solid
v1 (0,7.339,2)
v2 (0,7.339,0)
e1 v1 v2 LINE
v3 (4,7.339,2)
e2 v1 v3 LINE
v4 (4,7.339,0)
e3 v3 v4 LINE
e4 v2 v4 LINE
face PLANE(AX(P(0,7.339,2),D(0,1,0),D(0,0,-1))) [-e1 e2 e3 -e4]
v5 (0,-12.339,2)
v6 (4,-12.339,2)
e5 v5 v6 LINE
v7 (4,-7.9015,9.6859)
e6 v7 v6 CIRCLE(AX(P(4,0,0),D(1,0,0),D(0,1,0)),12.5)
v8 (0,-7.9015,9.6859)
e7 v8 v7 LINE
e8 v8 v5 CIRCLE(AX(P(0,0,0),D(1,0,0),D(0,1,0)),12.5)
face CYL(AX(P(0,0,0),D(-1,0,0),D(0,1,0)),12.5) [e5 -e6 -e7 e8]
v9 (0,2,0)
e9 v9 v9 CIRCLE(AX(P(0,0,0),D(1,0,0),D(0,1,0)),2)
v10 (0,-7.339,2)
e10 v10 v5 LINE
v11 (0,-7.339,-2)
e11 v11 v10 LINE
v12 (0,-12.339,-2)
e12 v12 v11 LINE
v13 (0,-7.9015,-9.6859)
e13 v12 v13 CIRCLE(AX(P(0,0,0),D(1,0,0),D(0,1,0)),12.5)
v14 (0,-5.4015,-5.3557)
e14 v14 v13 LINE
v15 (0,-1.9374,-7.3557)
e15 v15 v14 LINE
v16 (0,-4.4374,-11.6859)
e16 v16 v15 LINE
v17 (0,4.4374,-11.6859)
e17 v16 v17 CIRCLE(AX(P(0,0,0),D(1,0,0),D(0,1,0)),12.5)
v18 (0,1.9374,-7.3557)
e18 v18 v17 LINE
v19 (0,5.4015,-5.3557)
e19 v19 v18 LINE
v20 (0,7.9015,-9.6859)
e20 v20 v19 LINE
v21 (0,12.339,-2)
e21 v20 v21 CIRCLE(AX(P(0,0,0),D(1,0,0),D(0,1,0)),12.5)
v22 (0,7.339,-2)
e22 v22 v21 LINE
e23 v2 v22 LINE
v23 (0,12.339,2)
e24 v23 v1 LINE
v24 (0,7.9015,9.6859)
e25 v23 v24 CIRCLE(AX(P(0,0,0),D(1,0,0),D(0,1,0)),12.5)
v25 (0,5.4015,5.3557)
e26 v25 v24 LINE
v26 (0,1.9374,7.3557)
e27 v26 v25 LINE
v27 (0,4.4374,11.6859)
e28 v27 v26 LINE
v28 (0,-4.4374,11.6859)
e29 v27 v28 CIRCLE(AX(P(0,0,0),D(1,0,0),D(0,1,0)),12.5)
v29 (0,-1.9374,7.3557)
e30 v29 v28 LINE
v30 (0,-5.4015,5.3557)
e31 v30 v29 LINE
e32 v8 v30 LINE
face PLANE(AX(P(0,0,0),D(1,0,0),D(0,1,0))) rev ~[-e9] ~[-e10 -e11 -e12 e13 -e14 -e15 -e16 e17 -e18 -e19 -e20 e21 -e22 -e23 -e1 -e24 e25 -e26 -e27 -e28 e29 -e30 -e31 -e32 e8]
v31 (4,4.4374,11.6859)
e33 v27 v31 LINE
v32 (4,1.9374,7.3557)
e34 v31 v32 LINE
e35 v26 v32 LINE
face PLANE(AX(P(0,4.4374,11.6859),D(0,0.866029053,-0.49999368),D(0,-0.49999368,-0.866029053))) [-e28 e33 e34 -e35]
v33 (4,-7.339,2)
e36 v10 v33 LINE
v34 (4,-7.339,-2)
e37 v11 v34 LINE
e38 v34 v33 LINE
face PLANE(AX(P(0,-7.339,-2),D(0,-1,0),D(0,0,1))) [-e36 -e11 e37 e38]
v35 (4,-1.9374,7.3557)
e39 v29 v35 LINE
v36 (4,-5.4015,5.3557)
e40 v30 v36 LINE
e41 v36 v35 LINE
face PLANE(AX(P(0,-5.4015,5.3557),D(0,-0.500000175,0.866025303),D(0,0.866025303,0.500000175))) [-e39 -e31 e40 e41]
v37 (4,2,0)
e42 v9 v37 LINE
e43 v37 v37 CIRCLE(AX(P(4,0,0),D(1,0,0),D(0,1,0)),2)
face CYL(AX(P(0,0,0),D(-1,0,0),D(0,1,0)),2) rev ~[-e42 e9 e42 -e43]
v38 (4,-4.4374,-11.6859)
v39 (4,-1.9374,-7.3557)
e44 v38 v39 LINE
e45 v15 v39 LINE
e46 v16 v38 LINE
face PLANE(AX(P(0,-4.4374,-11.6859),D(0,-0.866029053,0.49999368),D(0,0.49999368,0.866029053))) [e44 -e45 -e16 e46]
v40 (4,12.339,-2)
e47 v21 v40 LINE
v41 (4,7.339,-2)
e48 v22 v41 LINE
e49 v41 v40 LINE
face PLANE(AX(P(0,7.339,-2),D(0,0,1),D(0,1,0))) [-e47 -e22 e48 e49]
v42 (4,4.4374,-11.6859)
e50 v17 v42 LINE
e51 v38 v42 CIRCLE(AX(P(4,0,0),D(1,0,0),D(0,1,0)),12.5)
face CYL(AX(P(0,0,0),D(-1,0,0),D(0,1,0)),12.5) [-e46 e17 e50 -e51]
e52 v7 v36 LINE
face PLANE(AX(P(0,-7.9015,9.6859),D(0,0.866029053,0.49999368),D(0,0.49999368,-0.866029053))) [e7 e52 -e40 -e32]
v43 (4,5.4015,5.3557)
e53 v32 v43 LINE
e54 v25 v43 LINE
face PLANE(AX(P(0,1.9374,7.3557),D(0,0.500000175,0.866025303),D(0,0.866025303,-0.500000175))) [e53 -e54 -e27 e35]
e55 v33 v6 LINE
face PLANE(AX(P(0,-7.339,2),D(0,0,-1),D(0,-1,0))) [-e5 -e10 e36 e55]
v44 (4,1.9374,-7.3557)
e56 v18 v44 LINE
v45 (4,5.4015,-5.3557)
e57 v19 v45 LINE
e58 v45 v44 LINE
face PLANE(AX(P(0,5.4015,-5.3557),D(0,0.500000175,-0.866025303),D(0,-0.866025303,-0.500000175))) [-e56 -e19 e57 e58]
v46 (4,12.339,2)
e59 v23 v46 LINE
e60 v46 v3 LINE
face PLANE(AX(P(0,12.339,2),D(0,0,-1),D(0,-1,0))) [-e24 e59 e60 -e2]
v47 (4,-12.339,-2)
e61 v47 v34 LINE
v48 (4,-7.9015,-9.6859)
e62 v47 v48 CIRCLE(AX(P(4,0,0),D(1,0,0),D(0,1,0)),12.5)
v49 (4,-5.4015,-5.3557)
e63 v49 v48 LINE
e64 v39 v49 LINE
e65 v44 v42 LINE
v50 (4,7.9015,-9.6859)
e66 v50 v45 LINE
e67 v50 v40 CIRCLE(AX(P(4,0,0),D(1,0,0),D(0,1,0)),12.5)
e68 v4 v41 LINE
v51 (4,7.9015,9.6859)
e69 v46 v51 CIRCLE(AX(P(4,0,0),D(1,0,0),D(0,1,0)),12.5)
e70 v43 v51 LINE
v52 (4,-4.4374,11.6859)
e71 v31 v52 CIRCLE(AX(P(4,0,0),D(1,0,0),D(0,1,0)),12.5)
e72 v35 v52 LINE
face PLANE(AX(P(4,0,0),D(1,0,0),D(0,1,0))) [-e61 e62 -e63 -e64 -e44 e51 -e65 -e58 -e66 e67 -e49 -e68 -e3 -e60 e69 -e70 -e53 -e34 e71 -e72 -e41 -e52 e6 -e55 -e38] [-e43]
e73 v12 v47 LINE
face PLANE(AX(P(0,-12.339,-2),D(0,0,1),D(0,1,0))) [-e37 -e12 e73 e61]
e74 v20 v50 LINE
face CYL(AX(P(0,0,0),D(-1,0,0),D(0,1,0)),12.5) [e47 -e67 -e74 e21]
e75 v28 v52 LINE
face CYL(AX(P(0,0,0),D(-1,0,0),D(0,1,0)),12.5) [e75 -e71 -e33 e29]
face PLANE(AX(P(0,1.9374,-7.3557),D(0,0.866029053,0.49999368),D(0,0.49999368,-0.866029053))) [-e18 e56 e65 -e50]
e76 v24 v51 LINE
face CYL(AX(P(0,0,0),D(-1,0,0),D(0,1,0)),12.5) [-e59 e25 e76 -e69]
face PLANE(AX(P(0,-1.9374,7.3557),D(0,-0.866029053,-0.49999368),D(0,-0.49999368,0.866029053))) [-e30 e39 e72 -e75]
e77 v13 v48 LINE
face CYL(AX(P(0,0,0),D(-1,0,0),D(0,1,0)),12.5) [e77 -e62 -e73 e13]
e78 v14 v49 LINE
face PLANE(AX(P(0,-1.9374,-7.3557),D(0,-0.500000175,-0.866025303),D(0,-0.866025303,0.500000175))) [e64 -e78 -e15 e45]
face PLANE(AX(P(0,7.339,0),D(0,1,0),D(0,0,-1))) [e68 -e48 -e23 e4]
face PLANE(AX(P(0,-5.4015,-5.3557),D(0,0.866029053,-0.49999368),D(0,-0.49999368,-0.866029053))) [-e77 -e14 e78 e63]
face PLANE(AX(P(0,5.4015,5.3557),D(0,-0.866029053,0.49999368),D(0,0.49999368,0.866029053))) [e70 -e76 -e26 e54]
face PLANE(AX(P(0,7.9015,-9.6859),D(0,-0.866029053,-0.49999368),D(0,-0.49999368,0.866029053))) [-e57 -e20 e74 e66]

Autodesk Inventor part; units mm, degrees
ref_plane "YZ Plane" through (0, 0, 0) normal (1, 0, 0) x (0, 1, 0)
ref_plane "XZ Plane" through (0, 0, 0) normal (0, 1, 0) x (-1, 0, 0)
ref_plane "XY Plane" through (0, 0, 0) normal (0, 0, 1) x (1, 0, 0)
sketch "Эскиз1" plane through (0, 0, 0) normal (1, 0, 0) x (0, 1, 0)
  circle A0 centre (0, 0) radius 12.5
  line L0 (12.339, 2) -> (7.339, 2)
  line L1 (7.339, 2) -> (7.339, -2)
  line L2 (7.339, -2) -> (12.339, -2)
  line L3 (12.5, 0) -> (0, 0)
  line L4 (4.4374, 11.6859) -> (1.9374, 7.3557)
  line L5 (1.9374, 7.3557) -> (5.4015, 5.3557)
  line L6 (5.4015, 5.3557) -> (7.9015, 9.6859)
  line L7 (-7.9015, 9.6859) -> (-5.4015, 5.3557)
  line L8 (-5.4015, 5.3557) -> (-1.9374, 7.3557)
  line L9 (-1.9374, 7.3557) -> (-4.4374, 11.6859)
  line L10 (-12.339, -2) -> (-7.339, -2)
  line L11 (-7.339, -2) -> (-7.339, 2)
  line L12 (-7.339, 2) -> (-12.339, 2)
  line L13 (-4.4374, -11.6859) -> (-1.9374, -7.3557)
  line L14 (-1.9374, -7.3557) -> (-5.4015, -5.3557)
  line L15 (-5.4015, -5.3557) -> (-7.9015, -9.6859)
  line L16 (7.9015, -9.6859) -> (5.4015, -5.3557)
  line L17 (5.4015, -5.3557) -> (1.9374, -7.3557)
  line L18 (1.9374, -7.3557) -> (4.4374, -11.6859)
  circle A1 centre (0, 0) radius 2
  point P0 (4.4374, 11.6859)
  point P1 (-12.339, 2)
  point P2 (-12.339, -2)
  point P3 (-7.9015, -9.6859)
  point P4 (-4.4374, -11.6859)
  point P5 (4.4374, -11.6859)
  point P6 (7.9015, 9.6859)
  dimension "d2" = 360
  dimension "d4" = 5
  dimension "d5" = 25
  dimension "d8" = 4
  dimension "d9" = 4
extrude "Выдавливание1" add sketch "Эскиз1" along normal blind 4 contours L0 L1 L2 A0 L16 L17 L18 L13 L14 L15 L10 L11 L12 L7 L8 L9 L4 L5 L6
properties part number "barrel_holder"
